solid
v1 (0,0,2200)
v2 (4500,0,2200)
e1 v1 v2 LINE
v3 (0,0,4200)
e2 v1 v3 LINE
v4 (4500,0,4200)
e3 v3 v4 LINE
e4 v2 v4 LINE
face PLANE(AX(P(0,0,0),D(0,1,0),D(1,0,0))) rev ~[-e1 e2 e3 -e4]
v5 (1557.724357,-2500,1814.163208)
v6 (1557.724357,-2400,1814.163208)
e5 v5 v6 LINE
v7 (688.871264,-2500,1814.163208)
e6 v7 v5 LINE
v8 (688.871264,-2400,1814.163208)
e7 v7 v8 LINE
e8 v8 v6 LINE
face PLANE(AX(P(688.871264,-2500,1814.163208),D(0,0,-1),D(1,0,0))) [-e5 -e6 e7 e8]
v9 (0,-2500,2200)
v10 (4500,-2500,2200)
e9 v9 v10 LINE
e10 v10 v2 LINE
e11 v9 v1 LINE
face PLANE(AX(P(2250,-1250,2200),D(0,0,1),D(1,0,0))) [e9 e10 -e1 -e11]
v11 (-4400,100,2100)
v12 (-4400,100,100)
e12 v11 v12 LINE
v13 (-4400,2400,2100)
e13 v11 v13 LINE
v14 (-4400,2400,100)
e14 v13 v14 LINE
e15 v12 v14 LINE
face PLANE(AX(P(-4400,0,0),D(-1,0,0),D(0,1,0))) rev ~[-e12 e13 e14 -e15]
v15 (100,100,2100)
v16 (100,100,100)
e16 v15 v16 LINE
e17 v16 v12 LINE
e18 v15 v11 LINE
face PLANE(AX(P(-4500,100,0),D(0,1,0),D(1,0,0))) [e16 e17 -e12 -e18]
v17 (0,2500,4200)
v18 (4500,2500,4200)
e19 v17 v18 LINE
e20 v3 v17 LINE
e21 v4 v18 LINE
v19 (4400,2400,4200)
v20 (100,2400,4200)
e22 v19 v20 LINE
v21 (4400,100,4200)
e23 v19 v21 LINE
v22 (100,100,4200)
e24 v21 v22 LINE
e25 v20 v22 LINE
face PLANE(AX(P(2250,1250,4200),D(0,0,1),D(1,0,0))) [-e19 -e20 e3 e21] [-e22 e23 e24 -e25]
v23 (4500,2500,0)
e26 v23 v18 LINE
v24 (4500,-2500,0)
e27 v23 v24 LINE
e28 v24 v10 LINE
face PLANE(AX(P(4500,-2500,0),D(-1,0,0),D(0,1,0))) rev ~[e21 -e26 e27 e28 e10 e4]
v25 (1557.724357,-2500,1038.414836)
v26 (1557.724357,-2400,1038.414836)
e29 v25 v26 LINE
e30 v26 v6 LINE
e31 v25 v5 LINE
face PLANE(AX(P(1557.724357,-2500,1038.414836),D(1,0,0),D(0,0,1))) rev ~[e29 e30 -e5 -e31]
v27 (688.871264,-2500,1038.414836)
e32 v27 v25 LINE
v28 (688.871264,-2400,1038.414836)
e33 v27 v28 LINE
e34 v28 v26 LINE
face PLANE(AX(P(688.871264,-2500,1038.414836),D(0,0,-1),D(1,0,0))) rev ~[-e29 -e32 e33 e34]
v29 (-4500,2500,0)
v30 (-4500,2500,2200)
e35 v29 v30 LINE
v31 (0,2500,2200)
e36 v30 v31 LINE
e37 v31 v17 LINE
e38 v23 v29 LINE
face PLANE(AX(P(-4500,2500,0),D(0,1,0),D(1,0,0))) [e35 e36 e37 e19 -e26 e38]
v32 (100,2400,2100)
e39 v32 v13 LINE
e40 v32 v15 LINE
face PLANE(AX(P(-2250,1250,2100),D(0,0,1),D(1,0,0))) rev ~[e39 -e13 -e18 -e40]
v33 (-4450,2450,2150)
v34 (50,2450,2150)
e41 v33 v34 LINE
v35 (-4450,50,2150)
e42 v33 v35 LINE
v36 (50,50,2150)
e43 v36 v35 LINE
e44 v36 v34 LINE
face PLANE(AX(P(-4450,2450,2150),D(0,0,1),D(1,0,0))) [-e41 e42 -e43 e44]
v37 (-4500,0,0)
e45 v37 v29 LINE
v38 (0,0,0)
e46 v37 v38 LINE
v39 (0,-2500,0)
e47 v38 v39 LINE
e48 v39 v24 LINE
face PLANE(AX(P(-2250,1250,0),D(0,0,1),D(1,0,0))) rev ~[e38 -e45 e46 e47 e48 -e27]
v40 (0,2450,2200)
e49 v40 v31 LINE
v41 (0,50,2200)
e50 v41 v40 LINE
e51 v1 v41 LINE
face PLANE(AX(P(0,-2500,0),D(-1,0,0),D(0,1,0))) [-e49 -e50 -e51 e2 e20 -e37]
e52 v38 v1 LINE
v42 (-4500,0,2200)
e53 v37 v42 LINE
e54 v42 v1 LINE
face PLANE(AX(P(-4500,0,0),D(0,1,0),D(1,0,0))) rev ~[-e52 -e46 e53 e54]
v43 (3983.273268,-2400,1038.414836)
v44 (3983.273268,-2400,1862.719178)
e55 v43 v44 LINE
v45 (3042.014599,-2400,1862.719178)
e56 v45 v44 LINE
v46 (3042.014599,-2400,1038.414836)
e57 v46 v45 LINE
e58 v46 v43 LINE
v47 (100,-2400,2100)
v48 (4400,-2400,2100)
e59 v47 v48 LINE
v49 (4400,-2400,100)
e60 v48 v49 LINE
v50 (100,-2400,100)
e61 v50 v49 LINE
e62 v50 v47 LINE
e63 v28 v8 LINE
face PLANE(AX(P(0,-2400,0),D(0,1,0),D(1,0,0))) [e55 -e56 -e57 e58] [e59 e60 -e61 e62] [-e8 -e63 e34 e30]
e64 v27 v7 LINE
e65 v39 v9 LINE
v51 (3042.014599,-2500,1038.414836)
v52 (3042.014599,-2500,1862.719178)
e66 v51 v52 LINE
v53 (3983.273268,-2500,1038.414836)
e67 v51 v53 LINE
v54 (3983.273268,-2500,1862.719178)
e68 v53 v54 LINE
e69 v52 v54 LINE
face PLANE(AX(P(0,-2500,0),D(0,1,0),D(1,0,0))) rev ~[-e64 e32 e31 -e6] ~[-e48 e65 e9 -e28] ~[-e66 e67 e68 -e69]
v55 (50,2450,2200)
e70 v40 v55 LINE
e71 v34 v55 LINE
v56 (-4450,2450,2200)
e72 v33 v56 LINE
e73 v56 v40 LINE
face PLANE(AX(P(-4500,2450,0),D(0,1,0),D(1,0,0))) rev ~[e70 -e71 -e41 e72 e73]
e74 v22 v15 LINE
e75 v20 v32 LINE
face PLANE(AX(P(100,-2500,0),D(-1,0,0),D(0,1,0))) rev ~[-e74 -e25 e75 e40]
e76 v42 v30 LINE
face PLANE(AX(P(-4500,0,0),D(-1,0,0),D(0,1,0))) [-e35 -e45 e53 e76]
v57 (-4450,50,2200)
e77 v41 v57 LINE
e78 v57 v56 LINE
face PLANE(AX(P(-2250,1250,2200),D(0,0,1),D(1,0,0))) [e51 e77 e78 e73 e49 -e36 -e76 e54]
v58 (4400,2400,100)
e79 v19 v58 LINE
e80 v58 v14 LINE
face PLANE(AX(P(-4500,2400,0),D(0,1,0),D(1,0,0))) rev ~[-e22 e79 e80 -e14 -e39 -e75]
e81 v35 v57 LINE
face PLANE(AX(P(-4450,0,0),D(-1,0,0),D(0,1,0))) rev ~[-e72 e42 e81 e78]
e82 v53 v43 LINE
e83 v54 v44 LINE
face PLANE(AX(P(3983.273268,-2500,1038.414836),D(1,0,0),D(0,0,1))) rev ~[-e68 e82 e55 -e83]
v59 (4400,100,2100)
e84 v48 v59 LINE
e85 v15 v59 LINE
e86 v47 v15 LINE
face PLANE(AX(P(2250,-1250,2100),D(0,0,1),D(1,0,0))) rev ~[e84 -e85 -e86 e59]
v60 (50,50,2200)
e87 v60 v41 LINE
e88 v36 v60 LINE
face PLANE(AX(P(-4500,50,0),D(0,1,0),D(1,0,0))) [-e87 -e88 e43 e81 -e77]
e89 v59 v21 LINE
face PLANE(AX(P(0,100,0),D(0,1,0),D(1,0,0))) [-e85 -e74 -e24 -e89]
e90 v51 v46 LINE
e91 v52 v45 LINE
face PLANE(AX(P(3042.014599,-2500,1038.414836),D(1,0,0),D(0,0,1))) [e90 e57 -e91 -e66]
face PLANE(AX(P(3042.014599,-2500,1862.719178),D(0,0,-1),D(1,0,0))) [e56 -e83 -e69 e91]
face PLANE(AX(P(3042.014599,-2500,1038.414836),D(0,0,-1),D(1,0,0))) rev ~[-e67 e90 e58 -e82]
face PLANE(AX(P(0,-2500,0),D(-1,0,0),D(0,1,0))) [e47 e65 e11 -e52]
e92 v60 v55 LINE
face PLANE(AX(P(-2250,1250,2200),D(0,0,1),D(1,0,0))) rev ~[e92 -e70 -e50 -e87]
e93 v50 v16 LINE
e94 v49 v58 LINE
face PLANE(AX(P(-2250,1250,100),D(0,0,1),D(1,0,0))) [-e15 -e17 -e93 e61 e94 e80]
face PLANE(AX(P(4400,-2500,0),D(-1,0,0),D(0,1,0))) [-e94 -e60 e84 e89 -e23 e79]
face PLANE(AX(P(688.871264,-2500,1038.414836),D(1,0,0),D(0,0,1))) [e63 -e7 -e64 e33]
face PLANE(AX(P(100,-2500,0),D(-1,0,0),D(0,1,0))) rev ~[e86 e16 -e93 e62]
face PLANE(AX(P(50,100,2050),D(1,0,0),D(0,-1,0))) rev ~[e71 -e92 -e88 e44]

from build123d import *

# Parameters (mm, degrees)
F0_W         = 4500
F0_H         = 2500
F1_DEPTH     = 4200
F2_DEPTH     = 2200
F3_DEPTH     = 2200
F4_T         = -100
F5_T         = 50
F5_T3_DEPTH  = 2300
F5_T5_DEPTH  = 4600
F5_T7_DEPTH  = 2200
F5_T9_DEPTH  = 4200
F5_T11_DEPTH = 8900
F5_T13_DEPTH = 2100
F5_T15_DEPTH = 4600
F5_T17_DEPTH = 4900
F5_T19_DEPTH = 4400
F5_T21_DEPTH = 2600
F5_T23_DEPTH = 2400
F6_W         = 868.8530921936
F6_H         = 775.7483720779
F6_W_2       = 941.2586688995
F6_H_2       = 824.3043422699
F7_DEPTH     = 100


# Not quite as in the source:
# - a shell that OpenCascade refuses in one call is made with other operations: the cavity is built on its own and cut out


with BuildPart() as f1:
    # F0 (on Top) → F1 (new body)
    with BuildSketch(Plane.XY):
        with Locations((2250, 1250)):
            Rectangle(F0_W, F0_H)
    extrude(amount=F1_DEPTH)

    # F0 (on Top) → F2 (join)
    with BuildSketch(Plane.XY):
        with Locations((2250, -1250)):
            Rectangle(F0_W, F0_H)
    extrude(amount=F2_DEPTH)

    # F0 (on Top) → F3 (join)
    with BuildSketch(Plane.XY):
        with Locations((-2250, 1250)):
            Rectangle(F0_W, F0_H)
    extrude(amount=F3_DEPTH)

    # F4
    f4_openings = [f1.faces().sort_by_distance(p)[0] for p in [
        (2250, 1250, 4200),
    ]]
    offset(amount=F4_T, openings=f4_openings, kind=Kind.INTERSECTION)

    # F5: shell of thickness 50, made by hand


with BuildPart() as f5_core1:
    # F5_t2: copy of F1
    add(f1.part)

    # the walls: a layer under each face that stays
    f5_faces = [f5_core1.faces().sort_by_distance(p)[0] for p in [
        (0, 1250, 3200),
        (0, 2500, 2100),
        (-3000, 1666.6666666667, 0),
        (-2250, 0, 1100),
        (2250, -2500, 1100),
        (2250, -1250, 2200),
        (0, -1250, 1100),
        (-4500, 1250, 1100),
        (4500, 0, 2100),
        (2250, 0, 3200),
        (150, 83.3333333333, 4200),
        (100, 1250, 3150),
        (2933.3333333333, 2400, 3516.6666666667),
        (-2933.3333333333, 1600, 100),
        (-2150, 100, 1100),
        (2250, -2400, 1100),
        (2250, -1150, 2100),
        (100, -1150, 1100),
        (-4400, 1250, 1100),
        (4400, -1600, 783.3333333333),
        (2250, 100, 3150),
        (-2150, 1250, 2100),
    ]]
    thicken(f5_faces, amount=-F5_T, mode=Mode.SUBTRACT)

    # F5_s4 → F5_t3 (cut)
    with BuildSketch(Plane.XY.offset(-50)):
        Polygon((-0.5, -0.5), (0, 50), (50, 50), (50, 0), align=None)
    extrude(amount=F5_T3_DEPTH, mode=Mode.SUBTRACT)

    # F5_s6 → F5_t5 (cut)
    with BuildSketch(Plane.YZ.offset(-50)):
        Polygon((-0.5, 2200.5), (0, 2150), (50, 2150), (50, 2200), align=None)
    extrude(amount=F5_T5_DEPTH, mode=Mode.SUBTRACT)

    # F5_s8 → F5_t7 (cut)
    with BuildSketch(Plane.XY.offset(2050)):
        Polygon((100.5, 100.5), (50, 100), (50, 50), (100, 50), align=None)
        Polygon((100.5, 2399.5), (50, 2400), (50, 2450), (100, 2450), align=None)
        Polygon((4399.5, 100.5), (4450, 100), (4450, 50), (4400, 50), align=None)
    extrude(amount=F5_T7_DEPTH, mode=Mode.SUBTRACT)

    # F5_s10 → F5_t9 (cut)
    with BuildSketch(Plane.XY.offset(50)):
        Polygon((4399.5, 2399.5), (4400, 2450), (4450, 2450), (4450, 2400), align=None)
    extrude(amount=F5_T9_DEPTH, mode=Mode.SUBTRACT)

    # F5_s12 → F5_t11 (cut)
    with BuildSketch(Plane.YZ.offset(-4450)):
        Polygon((2399.5, 100.5), (2450, 100), (2450, 50), (2400, 50), align=None)
    extrude(amount=F5_T11_DEPTH, mode=Mode.SUBTRACT)

    # F5_s14 → F5_t13 (cut)
    with BuildSketch(Plane.XY.offset(50)):
        Polygon((-4399.5, 2399.5), (-4400, 2450), (-4450, 2450), (-4450, 2400), align=None)
        Polygon((-4399.5, 100.5), (-4400, 50), (-4450, 50), (-4450, 100), align=None)
        Polygon((4399.5, -2399.5), (4400, -2450), (4450, -2450), (4450, -2400), align=None)
        Polygon((100.5, -2399.5), (100, -2450), (50, -2450), (50, -2400), align=None)
    extrude(amount=F5_T13_DEPTH, mode=Mode.SUBTRACT)

    # F5_s16 → F5_t15 (cut)
    with BuildSketch(Plane.YZ.offset(-4450)):
        Polygon((2399.5, 2099.5), (2450, 2100), (2450, 2150), (2400, 2150), align=None)
        Polygon((100.5, 100.5), (100, 50), (50, 50), (50, 100), align=None)
        Polygon((100.5, 2099.5), (50, 2100), (50, 2150), (100, 2150), align=None)
    extrude(amount=F5_T15_DEPTH, mode=Mode.SUBTRACT)

    # F5_s18 → F5_t17 (cut)
    with BuildSketch(Plane.XZ.offset(-2450)):
        Polygon((4399.5, 100.5), (4400, 50), (4450, 50), (4450, 100), align=None)
    extrude(amount=F5_T17_DEPTH, mode=Mode.SUBTRACT)

    # F5_s20 → F5_t19 (cut)
    with BuildSketch(Plane.YZ.offset(50)):
        Polygon((-2399.5, 100.5), (-2400, 50), (-2450, 50), (-2450, 100), align=None)
        Polygon((-2399.5, 2099.5), (-2450, 2100), (-2450, 2150), (-2400, 2150), align=None)
    extrude(amount=F5_T19_DEPTH, mode=Mode.SUBTRACT)

    # F5_s22 → F5_t21 (cut)
    with BuildSketch(Plane.XZ.offset(-150)):
        Polygon((100.5, 100.5), (100, 50), (50, 50), (50, 100), align=None)
        Polygon((100.5, 2099.5), (100, 2150), (50, 2150), (50, 2100), align=None)
        Polygon((4399.5, 2099.5), (4400, 2150), (4450, 2150), (4450, 2100), align=None)
    extrude(amount=F5_T21_DEPTH, mode=Mode.SUBTRACT)

    # F5_s24 → F5_t23 (cut)
    with BuildSketch(Plane.XZ.offset(-2450)):
        Polygon((-4399.5, 100.5), (-4400, 50), (-4450, 50), (-4450, 100), align=None)
        Polygon((-4399.5, 2099.5), (-4450, 2100), (-4450, 2150), (-4400, 2150), align=None)
    extrude(amount=F5_T23_DEPTH, mode=Mode.SUBTRACT)


with BuildPart() as f1_1:
    add(f1.part)

    # what is left inside the walls is the cavity
    f5_cavity = [f5_core1.part.solids().sort_by_distance(p)[0] for p in [
        (-2200, 850, 2199.5),
    ]]
    add(f5_cavity, mode=Mode.SUBTRACT)

    # F6 (on face) → F7 (cut, through all)
    with BuildSketch(Plane.XZ.offset(2500)):
        with Locations((1123.2978105545, 1426.2890219688)):
            Rectangle(F6_W, F6_H)
        with Locations((3512.6439332962, 1450.5670070648)):
            Rectangle(F6_W_2, F6_H_2)
    extrude(amount=-F7_DEPTH, mode=Mode.SUBTRACT)


solid = f1_1.part
